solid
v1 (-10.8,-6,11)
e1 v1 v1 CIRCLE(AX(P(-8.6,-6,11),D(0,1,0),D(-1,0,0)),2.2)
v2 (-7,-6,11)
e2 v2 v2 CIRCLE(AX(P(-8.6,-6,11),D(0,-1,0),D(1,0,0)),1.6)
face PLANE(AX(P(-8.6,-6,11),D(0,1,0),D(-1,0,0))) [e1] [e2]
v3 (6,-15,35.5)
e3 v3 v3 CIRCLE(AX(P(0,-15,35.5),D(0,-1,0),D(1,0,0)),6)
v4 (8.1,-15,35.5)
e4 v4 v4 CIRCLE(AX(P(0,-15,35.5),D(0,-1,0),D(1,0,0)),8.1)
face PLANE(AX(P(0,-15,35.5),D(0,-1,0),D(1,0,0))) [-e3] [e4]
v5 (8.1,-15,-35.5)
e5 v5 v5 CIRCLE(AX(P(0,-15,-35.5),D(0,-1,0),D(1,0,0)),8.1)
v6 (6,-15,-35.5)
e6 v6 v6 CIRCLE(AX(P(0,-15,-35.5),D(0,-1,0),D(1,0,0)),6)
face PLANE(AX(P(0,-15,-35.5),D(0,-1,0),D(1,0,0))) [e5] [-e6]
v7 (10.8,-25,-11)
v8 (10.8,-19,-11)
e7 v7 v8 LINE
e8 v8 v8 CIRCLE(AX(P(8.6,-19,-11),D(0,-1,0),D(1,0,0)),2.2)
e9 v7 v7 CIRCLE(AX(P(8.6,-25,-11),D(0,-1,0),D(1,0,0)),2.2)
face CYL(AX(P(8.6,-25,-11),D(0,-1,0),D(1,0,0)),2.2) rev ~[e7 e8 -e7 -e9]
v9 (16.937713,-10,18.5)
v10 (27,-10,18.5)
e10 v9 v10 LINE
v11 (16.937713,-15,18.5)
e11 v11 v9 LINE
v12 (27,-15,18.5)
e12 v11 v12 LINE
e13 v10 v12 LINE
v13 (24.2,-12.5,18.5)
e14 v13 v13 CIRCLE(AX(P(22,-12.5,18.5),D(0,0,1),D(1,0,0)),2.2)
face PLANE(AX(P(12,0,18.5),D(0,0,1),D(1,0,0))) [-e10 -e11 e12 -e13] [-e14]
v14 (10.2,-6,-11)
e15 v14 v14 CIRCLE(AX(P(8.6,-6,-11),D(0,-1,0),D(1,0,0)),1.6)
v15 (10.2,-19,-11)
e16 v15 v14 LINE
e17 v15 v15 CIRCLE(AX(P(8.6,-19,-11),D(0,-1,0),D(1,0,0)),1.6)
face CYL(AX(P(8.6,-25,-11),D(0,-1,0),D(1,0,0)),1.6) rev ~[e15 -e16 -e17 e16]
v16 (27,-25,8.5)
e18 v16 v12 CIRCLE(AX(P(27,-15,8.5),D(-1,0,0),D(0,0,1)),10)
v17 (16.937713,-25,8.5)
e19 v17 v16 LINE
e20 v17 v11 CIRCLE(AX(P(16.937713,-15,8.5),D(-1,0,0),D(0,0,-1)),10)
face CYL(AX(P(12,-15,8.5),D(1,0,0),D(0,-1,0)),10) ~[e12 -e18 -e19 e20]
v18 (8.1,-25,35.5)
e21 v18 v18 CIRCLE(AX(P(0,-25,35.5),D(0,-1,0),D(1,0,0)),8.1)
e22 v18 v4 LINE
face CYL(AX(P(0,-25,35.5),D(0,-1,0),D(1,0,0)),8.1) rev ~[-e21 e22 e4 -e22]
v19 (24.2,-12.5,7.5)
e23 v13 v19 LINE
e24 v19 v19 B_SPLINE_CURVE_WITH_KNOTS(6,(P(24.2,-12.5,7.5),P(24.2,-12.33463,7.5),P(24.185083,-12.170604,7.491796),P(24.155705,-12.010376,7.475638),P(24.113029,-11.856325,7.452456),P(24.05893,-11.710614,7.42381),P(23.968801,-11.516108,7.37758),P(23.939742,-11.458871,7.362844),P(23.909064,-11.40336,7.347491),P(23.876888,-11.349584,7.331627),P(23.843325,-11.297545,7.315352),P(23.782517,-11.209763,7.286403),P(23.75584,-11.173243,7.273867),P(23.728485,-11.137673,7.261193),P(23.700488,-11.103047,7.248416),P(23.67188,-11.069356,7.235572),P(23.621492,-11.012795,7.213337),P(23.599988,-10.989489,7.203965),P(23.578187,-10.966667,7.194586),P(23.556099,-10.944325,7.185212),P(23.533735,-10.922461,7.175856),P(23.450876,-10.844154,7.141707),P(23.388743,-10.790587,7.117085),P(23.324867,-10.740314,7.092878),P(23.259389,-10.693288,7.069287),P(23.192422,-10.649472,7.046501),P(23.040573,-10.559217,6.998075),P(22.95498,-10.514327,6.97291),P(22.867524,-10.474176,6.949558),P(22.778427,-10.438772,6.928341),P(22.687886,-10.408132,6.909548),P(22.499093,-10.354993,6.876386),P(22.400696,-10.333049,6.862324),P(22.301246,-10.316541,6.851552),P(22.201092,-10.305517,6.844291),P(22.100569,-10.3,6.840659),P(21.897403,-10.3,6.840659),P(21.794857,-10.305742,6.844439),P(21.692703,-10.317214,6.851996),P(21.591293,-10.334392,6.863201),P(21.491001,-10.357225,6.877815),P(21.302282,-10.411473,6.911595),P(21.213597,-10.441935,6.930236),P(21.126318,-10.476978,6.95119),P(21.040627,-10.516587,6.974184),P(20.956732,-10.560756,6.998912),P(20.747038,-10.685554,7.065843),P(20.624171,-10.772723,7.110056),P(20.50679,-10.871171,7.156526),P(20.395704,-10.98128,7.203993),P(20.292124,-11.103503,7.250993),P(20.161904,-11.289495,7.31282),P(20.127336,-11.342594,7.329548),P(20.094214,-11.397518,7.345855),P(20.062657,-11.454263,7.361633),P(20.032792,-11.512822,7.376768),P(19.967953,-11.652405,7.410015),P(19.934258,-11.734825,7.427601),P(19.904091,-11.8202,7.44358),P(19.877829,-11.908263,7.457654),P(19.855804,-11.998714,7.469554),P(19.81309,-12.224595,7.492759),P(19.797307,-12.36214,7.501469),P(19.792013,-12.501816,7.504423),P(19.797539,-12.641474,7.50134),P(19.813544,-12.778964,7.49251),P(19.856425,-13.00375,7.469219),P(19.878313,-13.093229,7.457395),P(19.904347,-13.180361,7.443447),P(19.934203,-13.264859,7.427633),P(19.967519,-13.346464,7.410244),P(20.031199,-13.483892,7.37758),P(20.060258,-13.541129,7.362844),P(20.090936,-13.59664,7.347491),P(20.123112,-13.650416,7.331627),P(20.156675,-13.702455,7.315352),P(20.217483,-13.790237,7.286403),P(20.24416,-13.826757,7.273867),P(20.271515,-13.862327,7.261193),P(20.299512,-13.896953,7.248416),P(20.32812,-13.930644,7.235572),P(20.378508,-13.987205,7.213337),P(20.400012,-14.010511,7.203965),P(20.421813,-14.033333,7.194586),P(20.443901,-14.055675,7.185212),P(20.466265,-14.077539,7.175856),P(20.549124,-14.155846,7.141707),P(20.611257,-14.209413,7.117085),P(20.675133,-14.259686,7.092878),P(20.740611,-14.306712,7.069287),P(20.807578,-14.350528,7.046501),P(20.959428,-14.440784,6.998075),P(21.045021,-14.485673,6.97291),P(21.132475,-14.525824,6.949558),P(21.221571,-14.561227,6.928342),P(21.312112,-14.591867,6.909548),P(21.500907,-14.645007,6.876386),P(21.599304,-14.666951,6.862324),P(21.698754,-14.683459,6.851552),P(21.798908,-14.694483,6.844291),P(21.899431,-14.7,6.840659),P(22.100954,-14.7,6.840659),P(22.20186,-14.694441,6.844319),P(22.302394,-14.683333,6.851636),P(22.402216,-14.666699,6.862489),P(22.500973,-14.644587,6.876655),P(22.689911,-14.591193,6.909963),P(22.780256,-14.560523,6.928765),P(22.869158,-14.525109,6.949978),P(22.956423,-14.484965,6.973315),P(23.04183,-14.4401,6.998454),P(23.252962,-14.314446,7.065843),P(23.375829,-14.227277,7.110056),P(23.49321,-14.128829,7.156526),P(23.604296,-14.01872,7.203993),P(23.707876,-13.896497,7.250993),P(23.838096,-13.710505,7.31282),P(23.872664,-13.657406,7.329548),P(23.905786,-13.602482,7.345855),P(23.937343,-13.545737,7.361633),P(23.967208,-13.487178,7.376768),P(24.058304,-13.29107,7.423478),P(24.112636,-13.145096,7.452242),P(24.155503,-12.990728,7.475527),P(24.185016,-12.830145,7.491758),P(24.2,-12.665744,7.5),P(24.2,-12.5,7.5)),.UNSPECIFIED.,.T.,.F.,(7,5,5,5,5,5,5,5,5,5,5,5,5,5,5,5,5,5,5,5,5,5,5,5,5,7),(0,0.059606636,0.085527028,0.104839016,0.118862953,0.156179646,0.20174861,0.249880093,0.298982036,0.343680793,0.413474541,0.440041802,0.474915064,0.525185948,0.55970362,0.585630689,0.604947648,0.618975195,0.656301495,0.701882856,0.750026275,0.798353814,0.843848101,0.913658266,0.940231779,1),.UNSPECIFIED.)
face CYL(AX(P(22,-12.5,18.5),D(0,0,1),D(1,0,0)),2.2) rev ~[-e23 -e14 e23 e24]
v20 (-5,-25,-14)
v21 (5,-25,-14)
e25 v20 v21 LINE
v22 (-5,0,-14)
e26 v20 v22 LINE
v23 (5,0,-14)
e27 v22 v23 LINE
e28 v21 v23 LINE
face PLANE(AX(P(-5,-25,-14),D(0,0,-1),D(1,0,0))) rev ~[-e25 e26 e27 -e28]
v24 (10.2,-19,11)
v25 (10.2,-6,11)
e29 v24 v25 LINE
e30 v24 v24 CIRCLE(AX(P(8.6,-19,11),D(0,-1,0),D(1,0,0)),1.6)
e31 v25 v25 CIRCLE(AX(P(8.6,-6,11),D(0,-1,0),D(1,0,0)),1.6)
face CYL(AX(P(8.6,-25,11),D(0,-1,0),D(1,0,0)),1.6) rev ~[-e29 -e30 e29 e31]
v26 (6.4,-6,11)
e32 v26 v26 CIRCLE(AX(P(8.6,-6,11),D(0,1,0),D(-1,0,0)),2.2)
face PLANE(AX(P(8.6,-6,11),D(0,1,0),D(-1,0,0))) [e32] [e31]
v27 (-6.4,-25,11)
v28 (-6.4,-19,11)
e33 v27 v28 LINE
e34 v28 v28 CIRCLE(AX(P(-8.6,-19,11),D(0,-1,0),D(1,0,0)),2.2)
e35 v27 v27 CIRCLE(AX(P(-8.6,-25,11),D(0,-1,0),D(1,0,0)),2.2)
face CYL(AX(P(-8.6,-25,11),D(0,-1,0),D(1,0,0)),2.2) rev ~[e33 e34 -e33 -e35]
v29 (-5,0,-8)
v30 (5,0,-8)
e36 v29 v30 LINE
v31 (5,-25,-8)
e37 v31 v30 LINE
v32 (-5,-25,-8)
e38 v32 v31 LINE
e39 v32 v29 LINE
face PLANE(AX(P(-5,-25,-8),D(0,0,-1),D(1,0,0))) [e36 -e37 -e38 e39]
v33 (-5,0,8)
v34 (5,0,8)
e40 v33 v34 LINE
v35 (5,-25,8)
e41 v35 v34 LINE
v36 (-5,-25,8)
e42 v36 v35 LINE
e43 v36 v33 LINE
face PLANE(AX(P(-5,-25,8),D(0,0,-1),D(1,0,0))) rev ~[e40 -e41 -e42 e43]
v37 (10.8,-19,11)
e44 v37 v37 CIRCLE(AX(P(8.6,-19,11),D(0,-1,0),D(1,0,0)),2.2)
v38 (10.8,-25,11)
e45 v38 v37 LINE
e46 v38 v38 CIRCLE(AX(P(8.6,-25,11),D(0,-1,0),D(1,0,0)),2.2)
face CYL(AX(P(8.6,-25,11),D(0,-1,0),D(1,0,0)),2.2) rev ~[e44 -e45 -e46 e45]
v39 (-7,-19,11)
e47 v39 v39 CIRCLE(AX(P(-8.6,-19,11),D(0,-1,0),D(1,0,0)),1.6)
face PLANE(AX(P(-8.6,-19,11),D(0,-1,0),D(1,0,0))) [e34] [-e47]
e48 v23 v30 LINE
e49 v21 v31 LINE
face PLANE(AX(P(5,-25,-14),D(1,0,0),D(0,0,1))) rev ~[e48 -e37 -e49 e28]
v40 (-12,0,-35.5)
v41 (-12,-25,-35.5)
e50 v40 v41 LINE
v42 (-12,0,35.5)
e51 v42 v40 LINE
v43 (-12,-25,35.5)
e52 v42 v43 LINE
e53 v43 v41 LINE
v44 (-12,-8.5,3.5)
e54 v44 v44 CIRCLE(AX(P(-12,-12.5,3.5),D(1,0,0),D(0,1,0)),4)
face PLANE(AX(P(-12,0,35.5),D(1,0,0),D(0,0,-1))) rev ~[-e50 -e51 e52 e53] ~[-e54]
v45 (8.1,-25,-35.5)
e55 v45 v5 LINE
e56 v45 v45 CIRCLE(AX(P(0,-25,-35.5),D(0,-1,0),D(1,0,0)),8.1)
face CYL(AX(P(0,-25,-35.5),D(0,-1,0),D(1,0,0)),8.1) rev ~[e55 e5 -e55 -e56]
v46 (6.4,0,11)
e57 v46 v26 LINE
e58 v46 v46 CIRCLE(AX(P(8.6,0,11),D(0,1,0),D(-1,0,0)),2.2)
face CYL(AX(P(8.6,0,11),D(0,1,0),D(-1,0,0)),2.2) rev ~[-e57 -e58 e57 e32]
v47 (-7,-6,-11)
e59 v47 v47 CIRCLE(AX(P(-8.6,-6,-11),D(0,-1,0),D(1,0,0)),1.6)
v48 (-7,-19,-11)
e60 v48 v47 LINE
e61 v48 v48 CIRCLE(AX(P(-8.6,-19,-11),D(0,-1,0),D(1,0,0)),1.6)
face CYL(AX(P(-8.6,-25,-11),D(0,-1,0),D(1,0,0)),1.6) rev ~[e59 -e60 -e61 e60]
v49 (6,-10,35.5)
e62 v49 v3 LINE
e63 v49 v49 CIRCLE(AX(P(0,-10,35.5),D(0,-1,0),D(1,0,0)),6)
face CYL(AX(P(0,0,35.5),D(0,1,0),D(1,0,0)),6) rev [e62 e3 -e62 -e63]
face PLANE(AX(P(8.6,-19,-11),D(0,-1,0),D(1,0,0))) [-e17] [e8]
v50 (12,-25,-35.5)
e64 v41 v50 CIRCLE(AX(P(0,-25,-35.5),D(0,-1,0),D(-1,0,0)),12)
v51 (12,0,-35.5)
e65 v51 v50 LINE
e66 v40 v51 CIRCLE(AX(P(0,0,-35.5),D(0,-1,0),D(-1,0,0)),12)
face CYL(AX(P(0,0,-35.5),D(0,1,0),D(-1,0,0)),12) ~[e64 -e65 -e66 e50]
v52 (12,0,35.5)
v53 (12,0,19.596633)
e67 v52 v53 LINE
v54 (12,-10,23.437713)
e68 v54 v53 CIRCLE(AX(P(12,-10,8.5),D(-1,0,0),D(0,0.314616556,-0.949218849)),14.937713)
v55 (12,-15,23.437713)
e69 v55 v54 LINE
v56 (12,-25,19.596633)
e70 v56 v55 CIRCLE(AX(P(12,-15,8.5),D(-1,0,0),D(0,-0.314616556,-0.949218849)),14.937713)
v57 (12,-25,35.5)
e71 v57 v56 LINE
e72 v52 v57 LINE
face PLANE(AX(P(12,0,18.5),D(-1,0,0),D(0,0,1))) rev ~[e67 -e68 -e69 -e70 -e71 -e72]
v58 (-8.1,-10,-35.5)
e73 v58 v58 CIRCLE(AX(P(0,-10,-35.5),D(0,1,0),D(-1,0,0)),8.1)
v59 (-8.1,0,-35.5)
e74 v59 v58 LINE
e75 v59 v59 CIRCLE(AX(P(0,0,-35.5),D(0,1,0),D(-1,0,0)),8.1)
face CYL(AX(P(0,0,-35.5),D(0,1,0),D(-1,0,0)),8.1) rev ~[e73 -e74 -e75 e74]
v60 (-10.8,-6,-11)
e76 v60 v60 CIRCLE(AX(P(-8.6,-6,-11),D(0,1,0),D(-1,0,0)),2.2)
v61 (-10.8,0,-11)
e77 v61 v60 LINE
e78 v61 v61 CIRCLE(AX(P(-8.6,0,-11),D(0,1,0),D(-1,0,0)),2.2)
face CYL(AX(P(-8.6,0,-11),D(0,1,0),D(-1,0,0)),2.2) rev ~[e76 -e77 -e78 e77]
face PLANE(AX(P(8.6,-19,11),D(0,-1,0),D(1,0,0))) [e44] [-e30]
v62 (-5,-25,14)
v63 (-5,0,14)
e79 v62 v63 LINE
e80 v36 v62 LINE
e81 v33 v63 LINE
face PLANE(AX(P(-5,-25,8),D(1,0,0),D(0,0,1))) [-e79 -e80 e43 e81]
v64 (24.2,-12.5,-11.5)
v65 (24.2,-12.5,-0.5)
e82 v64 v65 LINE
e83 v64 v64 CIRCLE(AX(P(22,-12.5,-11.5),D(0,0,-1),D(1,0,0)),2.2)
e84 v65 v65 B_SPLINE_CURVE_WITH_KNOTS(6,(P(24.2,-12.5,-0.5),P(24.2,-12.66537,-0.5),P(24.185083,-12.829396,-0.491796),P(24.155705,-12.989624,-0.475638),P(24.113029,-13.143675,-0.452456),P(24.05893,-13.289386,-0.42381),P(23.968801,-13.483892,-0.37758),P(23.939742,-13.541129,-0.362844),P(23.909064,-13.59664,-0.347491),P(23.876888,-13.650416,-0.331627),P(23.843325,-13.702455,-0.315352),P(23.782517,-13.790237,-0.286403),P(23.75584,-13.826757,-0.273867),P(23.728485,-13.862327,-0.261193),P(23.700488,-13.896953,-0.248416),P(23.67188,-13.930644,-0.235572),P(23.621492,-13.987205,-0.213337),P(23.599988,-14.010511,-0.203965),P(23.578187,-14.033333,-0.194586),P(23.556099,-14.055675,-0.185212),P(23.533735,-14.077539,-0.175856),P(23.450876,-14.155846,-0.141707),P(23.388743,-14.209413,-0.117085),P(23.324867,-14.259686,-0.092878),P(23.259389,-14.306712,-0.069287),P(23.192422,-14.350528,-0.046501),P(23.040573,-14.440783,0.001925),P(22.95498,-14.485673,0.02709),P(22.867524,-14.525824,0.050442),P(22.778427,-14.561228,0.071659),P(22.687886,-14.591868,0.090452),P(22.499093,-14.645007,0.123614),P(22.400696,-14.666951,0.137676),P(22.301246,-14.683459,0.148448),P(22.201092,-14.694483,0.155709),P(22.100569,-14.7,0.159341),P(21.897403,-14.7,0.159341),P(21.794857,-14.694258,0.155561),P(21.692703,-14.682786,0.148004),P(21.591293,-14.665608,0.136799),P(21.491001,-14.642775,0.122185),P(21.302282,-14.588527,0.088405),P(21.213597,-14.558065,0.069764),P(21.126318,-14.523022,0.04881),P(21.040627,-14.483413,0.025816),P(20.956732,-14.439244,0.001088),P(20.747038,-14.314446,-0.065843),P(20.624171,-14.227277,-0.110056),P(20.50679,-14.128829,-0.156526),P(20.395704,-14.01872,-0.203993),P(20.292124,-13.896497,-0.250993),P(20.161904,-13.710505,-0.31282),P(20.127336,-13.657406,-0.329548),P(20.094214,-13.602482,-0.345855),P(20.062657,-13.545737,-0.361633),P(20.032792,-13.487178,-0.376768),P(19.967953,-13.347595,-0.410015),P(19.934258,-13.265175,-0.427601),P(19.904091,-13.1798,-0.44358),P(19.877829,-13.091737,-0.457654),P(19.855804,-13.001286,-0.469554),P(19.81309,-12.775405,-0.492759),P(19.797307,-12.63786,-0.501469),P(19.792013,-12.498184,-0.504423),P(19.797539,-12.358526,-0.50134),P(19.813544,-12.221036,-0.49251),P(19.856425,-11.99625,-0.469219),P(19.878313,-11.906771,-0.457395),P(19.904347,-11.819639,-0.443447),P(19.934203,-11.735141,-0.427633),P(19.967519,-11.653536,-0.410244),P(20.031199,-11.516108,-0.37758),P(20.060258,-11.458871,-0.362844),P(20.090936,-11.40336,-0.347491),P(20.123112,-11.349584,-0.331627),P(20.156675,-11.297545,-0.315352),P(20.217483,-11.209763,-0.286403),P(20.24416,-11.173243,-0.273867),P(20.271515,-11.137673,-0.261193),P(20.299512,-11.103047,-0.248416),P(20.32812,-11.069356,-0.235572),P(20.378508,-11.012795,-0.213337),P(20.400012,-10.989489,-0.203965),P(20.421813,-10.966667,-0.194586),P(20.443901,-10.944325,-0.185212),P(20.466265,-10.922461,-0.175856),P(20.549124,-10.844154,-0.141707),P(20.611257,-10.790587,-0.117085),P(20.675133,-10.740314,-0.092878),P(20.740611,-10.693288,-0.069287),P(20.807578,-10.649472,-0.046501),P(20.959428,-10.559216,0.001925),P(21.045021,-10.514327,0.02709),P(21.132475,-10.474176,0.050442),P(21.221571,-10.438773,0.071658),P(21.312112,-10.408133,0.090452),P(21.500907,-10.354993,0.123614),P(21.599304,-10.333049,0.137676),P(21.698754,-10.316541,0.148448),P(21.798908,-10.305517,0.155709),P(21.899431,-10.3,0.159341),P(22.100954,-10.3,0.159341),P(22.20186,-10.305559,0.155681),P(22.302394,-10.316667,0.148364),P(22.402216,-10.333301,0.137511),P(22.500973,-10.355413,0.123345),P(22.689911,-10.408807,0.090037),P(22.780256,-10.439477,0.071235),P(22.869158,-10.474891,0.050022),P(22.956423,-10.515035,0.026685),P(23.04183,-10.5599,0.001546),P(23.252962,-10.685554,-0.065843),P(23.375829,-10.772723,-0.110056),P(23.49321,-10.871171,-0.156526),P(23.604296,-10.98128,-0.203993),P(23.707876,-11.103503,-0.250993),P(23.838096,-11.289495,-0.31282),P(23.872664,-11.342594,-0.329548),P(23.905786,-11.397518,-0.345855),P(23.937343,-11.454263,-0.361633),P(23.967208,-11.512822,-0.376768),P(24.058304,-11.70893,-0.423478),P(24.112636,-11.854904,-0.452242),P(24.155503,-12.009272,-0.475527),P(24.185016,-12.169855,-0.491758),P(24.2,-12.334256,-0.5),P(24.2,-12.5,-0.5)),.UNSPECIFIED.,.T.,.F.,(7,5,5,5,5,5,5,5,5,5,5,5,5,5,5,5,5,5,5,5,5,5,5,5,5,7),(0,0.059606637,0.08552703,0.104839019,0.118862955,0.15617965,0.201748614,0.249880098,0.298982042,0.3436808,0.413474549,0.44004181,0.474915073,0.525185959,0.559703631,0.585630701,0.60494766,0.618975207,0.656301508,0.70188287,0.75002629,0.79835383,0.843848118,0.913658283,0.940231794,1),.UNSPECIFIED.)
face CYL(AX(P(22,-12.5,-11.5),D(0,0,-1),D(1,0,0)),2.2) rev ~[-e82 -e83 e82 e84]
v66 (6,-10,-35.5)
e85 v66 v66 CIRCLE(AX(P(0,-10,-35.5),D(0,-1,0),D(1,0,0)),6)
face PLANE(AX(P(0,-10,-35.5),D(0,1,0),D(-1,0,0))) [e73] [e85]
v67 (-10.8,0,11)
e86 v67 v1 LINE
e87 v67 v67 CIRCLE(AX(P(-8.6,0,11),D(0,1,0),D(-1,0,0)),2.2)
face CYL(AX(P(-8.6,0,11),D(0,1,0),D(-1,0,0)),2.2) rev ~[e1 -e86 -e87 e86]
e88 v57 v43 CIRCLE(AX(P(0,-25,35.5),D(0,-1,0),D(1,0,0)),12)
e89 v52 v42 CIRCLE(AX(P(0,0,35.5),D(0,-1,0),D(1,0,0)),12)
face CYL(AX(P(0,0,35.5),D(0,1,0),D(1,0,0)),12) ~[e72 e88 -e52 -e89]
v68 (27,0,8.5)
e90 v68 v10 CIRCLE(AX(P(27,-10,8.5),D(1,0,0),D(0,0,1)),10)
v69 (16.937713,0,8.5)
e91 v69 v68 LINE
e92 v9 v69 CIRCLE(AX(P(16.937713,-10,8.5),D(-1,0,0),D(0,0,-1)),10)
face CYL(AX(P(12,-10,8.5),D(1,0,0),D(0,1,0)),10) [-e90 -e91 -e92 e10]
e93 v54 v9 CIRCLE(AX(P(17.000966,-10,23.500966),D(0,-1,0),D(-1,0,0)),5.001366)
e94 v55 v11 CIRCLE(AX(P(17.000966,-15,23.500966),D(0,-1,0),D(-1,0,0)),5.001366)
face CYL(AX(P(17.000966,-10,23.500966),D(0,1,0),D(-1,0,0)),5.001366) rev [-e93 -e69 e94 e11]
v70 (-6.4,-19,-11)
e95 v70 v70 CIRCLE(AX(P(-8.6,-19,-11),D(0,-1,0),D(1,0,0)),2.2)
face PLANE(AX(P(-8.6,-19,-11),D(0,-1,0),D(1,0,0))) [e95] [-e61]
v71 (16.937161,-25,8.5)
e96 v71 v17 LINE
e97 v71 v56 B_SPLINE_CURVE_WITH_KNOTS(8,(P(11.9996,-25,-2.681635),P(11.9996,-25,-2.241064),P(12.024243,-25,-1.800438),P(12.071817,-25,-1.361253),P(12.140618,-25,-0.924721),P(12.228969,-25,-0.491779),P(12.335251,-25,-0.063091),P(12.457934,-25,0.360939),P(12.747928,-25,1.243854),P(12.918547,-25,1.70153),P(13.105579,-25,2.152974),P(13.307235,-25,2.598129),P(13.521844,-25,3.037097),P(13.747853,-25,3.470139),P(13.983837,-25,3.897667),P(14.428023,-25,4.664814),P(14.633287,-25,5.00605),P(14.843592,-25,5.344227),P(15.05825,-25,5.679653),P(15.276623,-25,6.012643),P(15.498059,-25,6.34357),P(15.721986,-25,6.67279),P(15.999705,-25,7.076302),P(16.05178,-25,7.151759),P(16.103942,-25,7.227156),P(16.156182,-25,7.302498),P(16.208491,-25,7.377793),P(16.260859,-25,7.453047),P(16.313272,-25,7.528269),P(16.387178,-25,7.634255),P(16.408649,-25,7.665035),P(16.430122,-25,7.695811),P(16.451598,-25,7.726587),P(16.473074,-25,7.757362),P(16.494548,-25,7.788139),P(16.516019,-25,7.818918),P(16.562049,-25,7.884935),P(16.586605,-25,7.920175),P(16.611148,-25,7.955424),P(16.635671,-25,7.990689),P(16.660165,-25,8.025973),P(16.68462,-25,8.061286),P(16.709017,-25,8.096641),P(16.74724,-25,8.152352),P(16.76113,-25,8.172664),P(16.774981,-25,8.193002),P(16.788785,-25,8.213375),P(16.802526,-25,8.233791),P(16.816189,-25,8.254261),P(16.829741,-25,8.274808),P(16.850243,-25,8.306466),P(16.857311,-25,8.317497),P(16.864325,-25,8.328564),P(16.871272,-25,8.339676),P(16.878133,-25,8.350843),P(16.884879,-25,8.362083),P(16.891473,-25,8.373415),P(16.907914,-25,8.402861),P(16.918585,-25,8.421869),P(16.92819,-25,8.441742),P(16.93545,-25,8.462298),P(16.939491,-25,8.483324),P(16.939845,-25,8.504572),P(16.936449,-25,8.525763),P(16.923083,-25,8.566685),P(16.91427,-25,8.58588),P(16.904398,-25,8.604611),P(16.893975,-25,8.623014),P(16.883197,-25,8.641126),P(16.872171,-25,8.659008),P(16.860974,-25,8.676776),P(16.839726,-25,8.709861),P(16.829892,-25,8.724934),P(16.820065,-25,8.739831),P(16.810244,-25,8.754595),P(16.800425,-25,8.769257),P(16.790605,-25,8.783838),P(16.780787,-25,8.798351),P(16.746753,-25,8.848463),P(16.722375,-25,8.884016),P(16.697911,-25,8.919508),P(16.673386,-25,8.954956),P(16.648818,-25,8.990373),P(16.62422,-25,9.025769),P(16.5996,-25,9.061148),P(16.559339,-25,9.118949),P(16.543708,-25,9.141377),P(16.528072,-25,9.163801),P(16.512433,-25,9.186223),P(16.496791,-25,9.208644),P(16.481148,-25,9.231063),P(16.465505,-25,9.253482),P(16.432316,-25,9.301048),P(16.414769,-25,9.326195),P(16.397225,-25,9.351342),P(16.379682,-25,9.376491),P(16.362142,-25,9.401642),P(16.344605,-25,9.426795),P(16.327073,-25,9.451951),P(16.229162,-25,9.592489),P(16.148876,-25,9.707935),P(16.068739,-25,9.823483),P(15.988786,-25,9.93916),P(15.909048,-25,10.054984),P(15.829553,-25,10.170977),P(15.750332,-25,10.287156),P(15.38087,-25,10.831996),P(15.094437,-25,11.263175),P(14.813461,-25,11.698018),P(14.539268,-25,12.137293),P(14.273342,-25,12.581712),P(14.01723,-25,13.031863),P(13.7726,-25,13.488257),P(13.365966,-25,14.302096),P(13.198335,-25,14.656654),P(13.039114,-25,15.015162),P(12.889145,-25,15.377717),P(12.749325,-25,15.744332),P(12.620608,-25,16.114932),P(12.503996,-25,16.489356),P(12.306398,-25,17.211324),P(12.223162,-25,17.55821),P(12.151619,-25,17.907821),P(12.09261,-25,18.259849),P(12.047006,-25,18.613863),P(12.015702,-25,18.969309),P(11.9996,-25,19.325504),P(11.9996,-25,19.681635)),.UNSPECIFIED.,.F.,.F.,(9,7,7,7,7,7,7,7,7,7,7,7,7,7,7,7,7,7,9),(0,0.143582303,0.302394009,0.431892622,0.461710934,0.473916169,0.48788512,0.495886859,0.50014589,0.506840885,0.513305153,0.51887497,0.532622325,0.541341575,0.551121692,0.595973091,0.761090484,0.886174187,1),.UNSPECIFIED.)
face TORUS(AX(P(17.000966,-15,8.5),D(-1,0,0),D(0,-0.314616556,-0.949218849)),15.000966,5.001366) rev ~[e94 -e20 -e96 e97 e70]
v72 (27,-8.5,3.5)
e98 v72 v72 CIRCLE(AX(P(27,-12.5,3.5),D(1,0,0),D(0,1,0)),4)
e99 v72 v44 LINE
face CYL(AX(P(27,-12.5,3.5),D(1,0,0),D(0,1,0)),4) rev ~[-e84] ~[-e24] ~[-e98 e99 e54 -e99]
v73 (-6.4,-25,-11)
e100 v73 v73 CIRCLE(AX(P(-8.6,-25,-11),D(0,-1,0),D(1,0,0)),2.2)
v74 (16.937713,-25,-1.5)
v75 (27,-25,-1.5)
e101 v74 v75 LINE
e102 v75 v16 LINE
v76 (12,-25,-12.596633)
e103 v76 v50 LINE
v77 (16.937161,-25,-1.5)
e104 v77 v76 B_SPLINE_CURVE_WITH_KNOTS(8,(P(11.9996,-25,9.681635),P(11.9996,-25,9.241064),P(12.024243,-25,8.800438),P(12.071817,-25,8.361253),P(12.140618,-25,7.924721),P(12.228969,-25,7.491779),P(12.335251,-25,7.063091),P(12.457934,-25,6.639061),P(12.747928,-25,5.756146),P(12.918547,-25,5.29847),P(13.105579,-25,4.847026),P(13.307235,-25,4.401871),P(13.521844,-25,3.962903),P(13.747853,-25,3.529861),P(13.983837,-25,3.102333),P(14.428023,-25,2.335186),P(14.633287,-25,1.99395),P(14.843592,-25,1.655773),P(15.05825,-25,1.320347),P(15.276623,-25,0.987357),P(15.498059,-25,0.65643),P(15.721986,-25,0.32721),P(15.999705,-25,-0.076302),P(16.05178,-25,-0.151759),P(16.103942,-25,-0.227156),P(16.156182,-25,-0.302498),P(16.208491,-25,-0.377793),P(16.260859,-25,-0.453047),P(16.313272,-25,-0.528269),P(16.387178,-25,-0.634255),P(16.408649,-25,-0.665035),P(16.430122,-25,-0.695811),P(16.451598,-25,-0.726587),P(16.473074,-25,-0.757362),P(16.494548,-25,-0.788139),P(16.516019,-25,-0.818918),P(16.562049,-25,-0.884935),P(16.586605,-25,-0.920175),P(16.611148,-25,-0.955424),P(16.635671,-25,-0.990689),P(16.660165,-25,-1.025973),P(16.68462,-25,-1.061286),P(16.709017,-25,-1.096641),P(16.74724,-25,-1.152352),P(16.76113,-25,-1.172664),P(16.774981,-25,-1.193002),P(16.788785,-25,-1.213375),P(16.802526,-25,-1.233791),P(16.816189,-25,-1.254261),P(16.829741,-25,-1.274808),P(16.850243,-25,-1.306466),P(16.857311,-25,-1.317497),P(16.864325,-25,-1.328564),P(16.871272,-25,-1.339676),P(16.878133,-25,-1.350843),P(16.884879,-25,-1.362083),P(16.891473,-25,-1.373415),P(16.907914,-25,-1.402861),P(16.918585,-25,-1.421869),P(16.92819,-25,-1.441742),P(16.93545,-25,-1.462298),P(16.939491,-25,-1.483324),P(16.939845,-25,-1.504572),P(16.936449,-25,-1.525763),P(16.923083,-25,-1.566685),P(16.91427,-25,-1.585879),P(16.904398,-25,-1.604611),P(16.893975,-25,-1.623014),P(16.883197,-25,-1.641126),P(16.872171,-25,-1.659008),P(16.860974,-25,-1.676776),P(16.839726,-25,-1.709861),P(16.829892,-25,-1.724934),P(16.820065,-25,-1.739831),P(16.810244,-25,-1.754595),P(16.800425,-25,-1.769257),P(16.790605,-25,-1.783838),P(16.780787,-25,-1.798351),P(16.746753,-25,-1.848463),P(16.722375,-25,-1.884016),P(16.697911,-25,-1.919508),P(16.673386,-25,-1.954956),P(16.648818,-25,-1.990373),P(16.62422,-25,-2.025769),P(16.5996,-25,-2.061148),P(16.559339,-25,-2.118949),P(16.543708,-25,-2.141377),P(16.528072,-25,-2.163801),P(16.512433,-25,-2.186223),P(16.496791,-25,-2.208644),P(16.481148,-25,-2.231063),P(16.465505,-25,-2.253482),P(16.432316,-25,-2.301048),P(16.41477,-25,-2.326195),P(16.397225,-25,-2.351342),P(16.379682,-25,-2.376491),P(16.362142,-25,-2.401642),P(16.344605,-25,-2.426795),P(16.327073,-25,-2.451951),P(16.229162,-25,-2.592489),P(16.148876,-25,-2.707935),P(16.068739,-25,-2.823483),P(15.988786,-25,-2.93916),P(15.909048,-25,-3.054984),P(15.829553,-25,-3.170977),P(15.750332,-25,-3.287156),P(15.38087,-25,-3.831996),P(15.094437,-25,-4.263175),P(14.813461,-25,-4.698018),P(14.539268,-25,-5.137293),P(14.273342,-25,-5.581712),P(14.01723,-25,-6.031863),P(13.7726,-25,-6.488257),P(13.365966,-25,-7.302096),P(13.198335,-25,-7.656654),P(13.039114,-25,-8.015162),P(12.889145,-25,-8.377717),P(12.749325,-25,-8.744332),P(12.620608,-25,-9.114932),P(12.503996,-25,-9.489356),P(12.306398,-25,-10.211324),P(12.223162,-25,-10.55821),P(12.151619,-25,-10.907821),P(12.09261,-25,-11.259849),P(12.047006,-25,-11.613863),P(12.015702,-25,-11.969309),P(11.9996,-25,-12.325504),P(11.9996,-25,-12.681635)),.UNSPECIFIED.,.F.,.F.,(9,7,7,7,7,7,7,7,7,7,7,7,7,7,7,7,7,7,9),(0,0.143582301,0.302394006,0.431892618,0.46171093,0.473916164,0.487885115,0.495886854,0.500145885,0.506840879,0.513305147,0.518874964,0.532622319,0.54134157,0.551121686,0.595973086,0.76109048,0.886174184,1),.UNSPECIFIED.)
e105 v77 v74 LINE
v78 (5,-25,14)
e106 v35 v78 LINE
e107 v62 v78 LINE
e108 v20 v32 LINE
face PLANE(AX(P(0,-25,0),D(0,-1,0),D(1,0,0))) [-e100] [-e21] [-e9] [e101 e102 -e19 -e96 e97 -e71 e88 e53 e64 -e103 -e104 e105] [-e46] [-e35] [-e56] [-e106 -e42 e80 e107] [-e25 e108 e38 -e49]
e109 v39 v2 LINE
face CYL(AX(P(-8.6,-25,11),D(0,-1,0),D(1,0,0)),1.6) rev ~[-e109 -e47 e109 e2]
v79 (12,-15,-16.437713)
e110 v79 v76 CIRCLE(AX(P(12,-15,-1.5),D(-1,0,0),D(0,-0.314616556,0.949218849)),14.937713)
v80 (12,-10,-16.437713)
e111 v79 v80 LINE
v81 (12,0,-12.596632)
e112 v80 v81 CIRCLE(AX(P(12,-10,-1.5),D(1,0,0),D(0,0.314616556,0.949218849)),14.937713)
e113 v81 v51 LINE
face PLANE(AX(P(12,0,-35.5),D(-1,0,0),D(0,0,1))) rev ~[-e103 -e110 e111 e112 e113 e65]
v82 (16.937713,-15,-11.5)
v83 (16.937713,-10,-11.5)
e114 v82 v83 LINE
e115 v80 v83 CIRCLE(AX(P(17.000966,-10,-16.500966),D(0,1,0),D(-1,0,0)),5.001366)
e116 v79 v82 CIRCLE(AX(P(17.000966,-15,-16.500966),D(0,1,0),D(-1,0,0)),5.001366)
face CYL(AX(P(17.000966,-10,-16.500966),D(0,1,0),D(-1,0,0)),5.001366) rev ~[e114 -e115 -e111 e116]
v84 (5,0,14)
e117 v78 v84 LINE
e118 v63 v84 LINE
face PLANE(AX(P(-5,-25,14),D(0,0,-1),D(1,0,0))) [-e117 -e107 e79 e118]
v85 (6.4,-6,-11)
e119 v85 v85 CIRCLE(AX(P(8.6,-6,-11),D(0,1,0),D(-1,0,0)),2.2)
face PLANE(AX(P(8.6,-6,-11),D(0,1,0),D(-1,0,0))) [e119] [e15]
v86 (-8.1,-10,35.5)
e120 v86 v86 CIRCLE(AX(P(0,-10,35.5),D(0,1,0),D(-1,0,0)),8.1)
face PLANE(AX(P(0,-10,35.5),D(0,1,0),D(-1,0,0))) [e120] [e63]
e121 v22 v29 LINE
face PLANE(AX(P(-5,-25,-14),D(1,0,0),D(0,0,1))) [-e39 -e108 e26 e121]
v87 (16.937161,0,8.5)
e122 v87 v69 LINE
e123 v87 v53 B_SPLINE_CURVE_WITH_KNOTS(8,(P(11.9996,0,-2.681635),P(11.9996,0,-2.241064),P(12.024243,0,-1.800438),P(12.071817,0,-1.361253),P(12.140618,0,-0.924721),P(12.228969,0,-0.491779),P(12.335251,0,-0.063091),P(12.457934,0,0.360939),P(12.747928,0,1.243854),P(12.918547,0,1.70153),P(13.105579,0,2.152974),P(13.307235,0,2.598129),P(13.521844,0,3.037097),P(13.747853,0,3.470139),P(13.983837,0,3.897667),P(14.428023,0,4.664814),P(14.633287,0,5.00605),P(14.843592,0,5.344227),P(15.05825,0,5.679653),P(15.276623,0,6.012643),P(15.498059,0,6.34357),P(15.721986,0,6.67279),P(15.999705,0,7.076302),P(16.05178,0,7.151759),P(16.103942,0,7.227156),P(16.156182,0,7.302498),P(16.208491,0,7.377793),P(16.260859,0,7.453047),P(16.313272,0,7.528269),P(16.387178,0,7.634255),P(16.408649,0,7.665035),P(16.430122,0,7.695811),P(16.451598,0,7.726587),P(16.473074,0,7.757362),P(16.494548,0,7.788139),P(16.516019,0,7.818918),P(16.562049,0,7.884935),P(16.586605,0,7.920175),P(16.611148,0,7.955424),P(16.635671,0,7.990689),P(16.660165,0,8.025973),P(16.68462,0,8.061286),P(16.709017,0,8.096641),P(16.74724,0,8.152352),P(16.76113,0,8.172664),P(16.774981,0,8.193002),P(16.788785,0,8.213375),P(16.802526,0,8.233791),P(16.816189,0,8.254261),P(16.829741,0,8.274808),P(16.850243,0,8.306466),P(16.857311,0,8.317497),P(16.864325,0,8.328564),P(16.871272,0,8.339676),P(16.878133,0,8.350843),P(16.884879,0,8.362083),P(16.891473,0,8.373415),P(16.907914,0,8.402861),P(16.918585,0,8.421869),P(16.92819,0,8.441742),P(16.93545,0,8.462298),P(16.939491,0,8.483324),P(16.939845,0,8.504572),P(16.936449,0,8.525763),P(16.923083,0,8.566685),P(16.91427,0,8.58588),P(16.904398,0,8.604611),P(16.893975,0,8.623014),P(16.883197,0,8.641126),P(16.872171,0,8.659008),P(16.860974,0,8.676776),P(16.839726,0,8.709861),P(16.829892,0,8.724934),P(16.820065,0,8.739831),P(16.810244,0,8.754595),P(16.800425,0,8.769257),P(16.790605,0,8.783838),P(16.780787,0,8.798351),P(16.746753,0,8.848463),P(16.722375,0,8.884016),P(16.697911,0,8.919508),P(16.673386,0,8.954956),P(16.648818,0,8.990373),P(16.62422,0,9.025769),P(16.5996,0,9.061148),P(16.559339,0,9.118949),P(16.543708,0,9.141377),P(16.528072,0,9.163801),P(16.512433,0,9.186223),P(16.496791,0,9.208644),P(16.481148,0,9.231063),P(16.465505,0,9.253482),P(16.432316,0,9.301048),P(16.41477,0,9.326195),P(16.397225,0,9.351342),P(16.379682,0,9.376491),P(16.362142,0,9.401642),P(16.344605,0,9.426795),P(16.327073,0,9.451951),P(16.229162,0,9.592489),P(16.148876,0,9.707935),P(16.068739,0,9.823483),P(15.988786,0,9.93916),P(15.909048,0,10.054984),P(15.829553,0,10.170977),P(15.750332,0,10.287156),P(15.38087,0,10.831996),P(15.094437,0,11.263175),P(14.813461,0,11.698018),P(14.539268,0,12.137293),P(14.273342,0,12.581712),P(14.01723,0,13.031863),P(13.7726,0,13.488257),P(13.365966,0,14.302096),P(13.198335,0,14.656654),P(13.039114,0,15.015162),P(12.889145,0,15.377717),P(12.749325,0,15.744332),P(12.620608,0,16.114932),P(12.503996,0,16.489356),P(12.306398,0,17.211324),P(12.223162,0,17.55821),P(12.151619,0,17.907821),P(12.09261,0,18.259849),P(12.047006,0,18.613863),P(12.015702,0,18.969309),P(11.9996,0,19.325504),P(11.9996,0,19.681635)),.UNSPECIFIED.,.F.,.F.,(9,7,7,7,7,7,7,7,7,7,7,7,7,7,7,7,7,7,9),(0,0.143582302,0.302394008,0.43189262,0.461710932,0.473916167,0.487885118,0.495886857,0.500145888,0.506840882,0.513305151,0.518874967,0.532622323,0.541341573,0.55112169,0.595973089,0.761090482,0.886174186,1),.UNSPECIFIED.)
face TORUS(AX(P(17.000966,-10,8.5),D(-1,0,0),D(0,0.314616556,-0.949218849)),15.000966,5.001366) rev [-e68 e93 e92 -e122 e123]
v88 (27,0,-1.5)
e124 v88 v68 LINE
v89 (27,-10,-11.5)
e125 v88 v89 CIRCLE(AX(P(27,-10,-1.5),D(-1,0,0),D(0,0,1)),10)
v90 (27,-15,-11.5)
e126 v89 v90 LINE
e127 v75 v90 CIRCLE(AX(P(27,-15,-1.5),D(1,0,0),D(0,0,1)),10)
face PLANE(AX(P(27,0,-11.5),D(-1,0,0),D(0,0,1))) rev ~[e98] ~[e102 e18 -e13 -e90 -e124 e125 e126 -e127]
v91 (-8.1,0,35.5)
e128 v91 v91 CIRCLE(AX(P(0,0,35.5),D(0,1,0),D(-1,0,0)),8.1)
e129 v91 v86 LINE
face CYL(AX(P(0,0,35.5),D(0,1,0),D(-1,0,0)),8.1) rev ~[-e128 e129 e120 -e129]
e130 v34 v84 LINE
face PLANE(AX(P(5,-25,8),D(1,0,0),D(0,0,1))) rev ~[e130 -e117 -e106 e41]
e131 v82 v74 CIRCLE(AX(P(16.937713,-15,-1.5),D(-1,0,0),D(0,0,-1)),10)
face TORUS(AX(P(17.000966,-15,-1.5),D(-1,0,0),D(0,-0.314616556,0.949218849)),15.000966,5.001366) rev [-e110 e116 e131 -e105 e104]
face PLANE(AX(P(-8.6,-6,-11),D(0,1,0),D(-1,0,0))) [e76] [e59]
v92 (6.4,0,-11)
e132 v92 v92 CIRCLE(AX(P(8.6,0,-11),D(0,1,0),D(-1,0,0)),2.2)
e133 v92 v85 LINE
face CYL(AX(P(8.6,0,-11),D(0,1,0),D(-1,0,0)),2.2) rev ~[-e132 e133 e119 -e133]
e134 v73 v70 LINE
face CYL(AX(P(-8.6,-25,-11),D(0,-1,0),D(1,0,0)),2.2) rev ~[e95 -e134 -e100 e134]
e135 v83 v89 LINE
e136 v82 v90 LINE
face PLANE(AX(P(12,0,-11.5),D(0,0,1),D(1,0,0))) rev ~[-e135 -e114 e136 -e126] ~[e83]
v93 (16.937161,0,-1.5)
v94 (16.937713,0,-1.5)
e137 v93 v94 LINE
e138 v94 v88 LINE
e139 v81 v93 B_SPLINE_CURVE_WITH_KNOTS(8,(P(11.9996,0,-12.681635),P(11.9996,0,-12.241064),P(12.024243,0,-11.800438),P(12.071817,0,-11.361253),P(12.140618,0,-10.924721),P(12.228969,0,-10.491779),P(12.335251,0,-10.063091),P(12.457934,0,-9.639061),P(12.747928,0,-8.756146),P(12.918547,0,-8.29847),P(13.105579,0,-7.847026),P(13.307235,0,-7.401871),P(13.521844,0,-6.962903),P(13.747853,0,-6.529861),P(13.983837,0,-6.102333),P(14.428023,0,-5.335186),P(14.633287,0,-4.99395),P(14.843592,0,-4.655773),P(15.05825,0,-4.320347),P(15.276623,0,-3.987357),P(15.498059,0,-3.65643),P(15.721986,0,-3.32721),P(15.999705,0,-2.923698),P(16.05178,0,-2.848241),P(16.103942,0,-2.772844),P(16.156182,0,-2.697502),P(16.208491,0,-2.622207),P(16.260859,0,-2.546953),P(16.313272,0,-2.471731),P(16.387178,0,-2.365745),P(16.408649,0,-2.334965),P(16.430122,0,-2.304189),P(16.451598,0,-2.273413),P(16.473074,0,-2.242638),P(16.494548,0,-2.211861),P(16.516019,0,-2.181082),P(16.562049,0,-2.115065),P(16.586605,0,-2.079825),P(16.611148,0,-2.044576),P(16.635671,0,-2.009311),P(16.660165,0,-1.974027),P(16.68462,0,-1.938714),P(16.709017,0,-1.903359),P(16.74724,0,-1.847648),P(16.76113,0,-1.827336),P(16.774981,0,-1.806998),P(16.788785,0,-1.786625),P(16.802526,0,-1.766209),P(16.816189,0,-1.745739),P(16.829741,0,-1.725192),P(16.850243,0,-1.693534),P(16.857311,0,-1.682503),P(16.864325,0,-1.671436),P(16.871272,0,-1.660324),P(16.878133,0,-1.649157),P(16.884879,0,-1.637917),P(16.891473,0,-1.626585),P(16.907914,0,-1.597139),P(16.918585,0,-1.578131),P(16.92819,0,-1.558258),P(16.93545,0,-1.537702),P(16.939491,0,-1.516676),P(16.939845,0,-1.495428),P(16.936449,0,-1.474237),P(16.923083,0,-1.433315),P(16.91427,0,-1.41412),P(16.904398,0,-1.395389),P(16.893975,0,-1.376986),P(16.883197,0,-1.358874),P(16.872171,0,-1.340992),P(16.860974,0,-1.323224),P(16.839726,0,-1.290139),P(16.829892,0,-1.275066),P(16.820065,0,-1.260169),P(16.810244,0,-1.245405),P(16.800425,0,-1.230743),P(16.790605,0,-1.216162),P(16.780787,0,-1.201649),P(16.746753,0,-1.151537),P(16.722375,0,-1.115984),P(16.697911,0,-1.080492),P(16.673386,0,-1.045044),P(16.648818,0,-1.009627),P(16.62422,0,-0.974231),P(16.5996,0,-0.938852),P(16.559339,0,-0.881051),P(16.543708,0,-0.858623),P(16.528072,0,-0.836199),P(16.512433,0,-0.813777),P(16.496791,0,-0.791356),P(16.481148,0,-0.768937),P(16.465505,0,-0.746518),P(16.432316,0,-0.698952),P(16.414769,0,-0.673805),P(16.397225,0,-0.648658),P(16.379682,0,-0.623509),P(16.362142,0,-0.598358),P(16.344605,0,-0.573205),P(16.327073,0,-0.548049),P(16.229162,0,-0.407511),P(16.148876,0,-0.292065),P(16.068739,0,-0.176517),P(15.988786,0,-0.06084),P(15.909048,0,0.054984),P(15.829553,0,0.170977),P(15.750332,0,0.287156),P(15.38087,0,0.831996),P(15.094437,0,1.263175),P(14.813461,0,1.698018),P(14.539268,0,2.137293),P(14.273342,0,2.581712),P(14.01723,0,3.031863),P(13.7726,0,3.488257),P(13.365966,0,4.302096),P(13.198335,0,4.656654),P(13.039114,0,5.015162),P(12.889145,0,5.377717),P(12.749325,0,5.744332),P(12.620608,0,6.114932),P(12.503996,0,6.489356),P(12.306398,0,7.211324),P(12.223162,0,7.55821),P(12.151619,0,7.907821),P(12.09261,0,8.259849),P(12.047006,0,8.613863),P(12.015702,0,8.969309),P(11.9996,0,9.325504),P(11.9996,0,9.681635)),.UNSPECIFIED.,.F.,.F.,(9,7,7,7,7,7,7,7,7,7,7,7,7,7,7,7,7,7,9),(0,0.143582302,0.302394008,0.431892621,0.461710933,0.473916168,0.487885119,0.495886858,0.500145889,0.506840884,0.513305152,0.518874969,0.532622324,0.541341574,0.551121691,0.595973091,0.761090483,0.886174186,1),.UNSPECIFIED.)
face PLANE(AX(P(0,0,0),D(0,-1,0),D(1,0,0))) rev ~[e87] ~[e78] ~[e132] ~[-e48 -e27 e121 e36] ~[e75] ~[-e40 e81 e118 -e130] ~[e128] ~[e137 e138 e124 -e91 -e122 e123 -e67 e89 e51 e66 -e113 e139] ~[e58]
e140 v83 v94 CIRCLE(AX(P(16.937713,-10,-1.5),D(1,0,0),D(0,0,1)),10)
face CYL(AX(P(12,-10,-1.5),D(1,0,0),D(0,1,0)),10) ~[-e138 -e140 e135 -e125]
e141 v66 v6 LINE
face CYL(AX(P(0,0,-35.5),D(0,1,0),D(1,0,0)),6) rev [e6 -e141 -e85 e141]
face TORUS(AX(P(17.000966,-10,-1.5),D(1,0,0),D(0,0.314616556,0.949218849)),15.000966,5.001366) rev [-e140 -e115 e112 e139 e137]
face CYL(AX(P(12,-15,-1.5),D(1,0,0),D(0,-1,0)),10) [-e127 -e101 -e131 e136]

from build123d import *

# Parameters (mm, degrees)
F0_R         = 6
F0_W         = 15
F0_H         = 30
F1_DEPTH     = 25
F2_R         = 8.1
F2_R_2       = 6
F3_DEPTH     = 10
F4_R         = 8.1
F4_R_2       = 6
F5_DEPTH     = 10
F6_R         = 4
F7_DEPTH     = 39.001
F8_R         = 10
F9_T1_DEPTH  = 5
F9_T6_ANGLE  = 161.6623328293
F9_T11_ANGLE = 161.6623328293
F9_T16_ANGLE = 161.6623328293
F9_T21_ANGLE = 161.6623328293
F10_R        = 2.2
F11_DEPTH    = 11.6603414823
F12_R        = 2.2
F13_DEPTH    = 11.6603414823
F14_R        = 1.6
F14_W        = 10
F14_H        = 6
F15_DEPTH    = 25.0010004328
F16_R        = 2.2
F16_R_2      = 1.6
F17_DEPTH    = 6
F18_R        = 2.2
F19_DEPTH    = 6


# Not quite as in the source:
# - a fillet or chamfer that OpenCascade refuses, or shapes differently, is made with other operations: its cross-section is extruded or revolved along the edge and cut away or added


with BuildPart() as f1:
    # F0 (on Front) → F1 (new body)
    with BuildSketch(Plane.XZ):
        with BuildLine():
            Line((12, 18.5), (12, 35.5))
            ThreePointArc((12, 35.5), (0, 23.5), (-12, 35.5))
            Line((-12, 35.5), (-12, -35.5))
            ThreePointArc((-12, -35.5), (0, -23.5), (12, -35.5))
            Line((12, -35.5), (12, -11.5))
            Line((12, -11.5), (12, 18.5))
        make_face()
        with BuildLine():
            ThreePointArc((-12, 35.5), (0, 23.5), (12, 35.5))
            ThreePointArc((12, 35.5), (0, 47.5), (-12, 35.5))
        make_face()
        with Locations((0, 35.5)):
            Circle(F0_R, mode=Mode.SUBTRACT)
        with BuildLine():
            ThreePointArc((12, -35.5), (0, -23.5), (-12, -35.5))
            ThreePointArc((-12, -35.5), (0, -47.5), (12, -35.5))
        make_face()
        with Locations((0, -35.5)):
            Circle(F0_R, mode=Mode.SUBTRACT)
        with Locations((19.5, 3.5)):
            Rectangle(F0_W, F0_H)
    extrude(amount=F1_DEPTH)

    # F2 (on face) → F3 (cut)
    with BuildSketch(Plane.XZ.offset(25)):
        with Locations((0, 35.5)):
            Circle(F2_R)
        with Locations((0, 35.5)):
            Circle(F2_R_2, mode=Mode.SUBTRACT)
        with Locations((0, -35.5)):
            Circle(F2_R)
        with Locations((0, -35.5)):
            Circle(F2_R_2, mode=Mode.SUBTRACT)
    extrude(amount=-F3_DEPTH, mode=Mode.SUBTRACT)

    # F4 (on face) → F5 (cut)
    with BuildSketch(Plane(origin=(0, 0, 0), x_dir=(-1, 0, 0), z_dir=(0, 1, 0))):
        with Locations((0, 35.5)):
            Circle(F4_R)
        with Locations((0, 35.5)):
            Circle(F4_R_2, mode=Mode.SUBTRACT)
        with Locations((0, -35.5)):
            Circle(F4_R)
        with Locations((0, -35.5)):
            Circle(F4_R_2, mode=Mode.SUBTRACT)
    extrude(amount=-F5_DEPTH, mode=Mode.SUBTRACT)

    # F6 (on face) → F7 (cut, through all)
    with BuildSketch(Plane.YZ.offset(27)):
        with Locations((-12.5, 3.5)):
            Circle(F6_R)
    extrude(amount=-F7_DEPTH, mode=Mode.SUBTRACT)

    # F8
    f8_edges = [f1.edges().sort_by_distance(p)[0] for p in [
        (19.5, -25, 18.5),
        (19.5, 0, 18.5),
        (19.5, -25, -11.5),
        (19.5, 0, -11.5),
    ]]
    fillet(f8_edges, radius=F8_R)

    # F9: fillet of radius 5 on 6 edges, made by hand

    # F9_s2 → F9_t1 (join)
    with BuildSketch(Plane.XZ.offset(10)):
        with BuildLine():
            ThreePointArc((11.9996, 23.5009656854), (13.4644660941, 19.9644660941), (17.0009656854, 18.4996))
            Line((17.0009656854, 18.4996), (17.0009656854, 17.9994634315))
            ThreePointArc((17.0009656854, 17.9994634315), (14.5004828427, 17.9998634315), (12, 17.9998634315))
            Line((12, 17.9998634315), (11.4998634315, 18.5))
            ThreePointArc((11.4998634315, 18.5), (11.4998634315, 21.0004828427), (11.4994634315, 23.5009656854))
            Line((11.4994634315, 23.5009656854), (11.9996, 23.5009656854))
        make_face()
        with BuildLine():
            ThreePointArc((11.9996, -16.5009656854), (13.4644660941, -12.9644660941), (17.0009656854, -11.4996))
            Line((17.0009656854, -11.4996), (17.0009656854, -10.9994634315))
            ThreePointArc((17.0009656854, -10.9994634315), (14.5004828427, -10.9998634315), (12, -10.9998634315))
            Line((12, -10.9998634315), (11.4998634315, -11.5))
            ThreePointArc((11.4998634315, -11.5), (11.4998634315, -14.0004828427), (11.4994634315, -16.5009656854))
            Line((11.4994634315, -16.5009656854), (11.9996, -16.5009656854))
        make_face()
    extrude(amount=F9_T1_DEPTH)


with BuildPart() as f9_tool4:
    # F9_s5 → F9_t6 (revolve)
    with BuildSketch(Plane(origin=(0, -6.4717245278, -2.1450392426), x_dir=(1, 0, 0), z_dir=(0, -0.9492188488, -0.3146165557))):
        with BuildLine():
            ThreePointArc((11.9996, -3.7864399137), (13.4644660941, -0.2499403224), (17.0009656854, 1.2149257717))
            Line((17.0009656854, 1.2149257717), (17.0009656854, 1.7150623402))
            ThreePointArc((17.0009656854, 1.7150623402), (14.5004828427, 1.7146623402), (12, 1.7146623402))
            Line((12, 1.7146623402), (11.4998634315, 1.2145257717))
            ThreePointArc((11.4998634315, 1.2145257717), (11.4998634315, -1.285957071), (11.4994634315, -3.7864399137))
            Line((11.4994634315, -3.7864399137), (11.9996, -3.7864399137))
        make_face()
    revolve(axis=Axis((12, -10, 8.5), (1, 0, 0)), revolution_arc=F9_T6_ANGLE)

    split(bisect_by=Plane.XZ, keep=Keep.TOP)


with BuildPart() as f1_1:
    add(f1.part)

    # F9_t3: union F9_tool4
    add(f9_tool4.part)


with BuildPart() as f9_tool9:
    # F9_s10 → F9_t11 (revolve)
    with BuildSketch(Plane(origin=(0, -16.053686044, 5.3209598778), x_dir=(1, 0, 0), z_dir=(0, 0.9492188488, -0.3146165557))):
        with BuildLine():
            ThreePointArc((11.9996, 11.6518538065), (13.4644660941, 8.1153542151), (17.0009656854, 6.650488121))
            Line((17.0009656854, 6.650488121), (17.0009656854, 6.1503515525))
            ThreePointArc((17.0009656854, 6.1503515525), (14.5004828427, 6.1507515525), (12, 6.1507515525))
            Line((12, 6.1507515525), (11.4998634315, 6.650888121))
            ThreePointArc((11.4998634315, 6.650888121), (11.4998634315, 9.1513709638), (11.4994634315, 11.6518538065))
            Line((11.4994634315, 11.6518538065), (11.9996, 11.6518538065))
        make_face()
    revolve(axis=Axis((12, -15, 8.5), (-1, 0, 0)), revolution_arc=F9_T11_ANGLE)

    split(bisect_by=Plane.XZ.offset(25), keep=Keep.BOTTOM)


with BuildPart() as f1_2:
    add(f1_1.part)

    # F9_t8: union F9_tool9
    add(f9_tool9.part)


with BuildPart() as f9_tool14:
    # F9_s15 → F9_t16 (revolve)
    with BuildSketch(Plane(origin=(0, -8.5622042815, 2.8379242825), x_dir=(1, 0, 0), z_dir=(0, -0.9492188488, 0.3146165557))):
        with BuildLine():
            ThreePointArc((17.0009656854, 5.4296061697), (13.4644660941, 6.8944722638), (11.9996, 10.4309718552))
            Line((11.9996, 10.4309718552), (11.4994634315, 10.4309718552))
            ThreePointArc((11.4994634315, 10.4309718552), (11.4998634315, 7.9304890124), (11.4998634315, 5.4300061697))
            Line((11.4998634315, 5.4300061697), (12, 4.9298696012))
            ThreePointArc((12, 4.9298696012), (14.5004828427, 4.9298696012), (17.0009656854, 4.9294696012))
            Line((17.0009656854, 4.9294696012), (17.0009656854, 5.4296061697))
        make_face()
    revolve(axis=Axis((12, -10, -1.5), (-1, 0, 0)), revolution_arc=F9_T16_ANGLE)

    split(bisect_by=Plane.XZ, keep=Keep.TOP)


with BuildPart() as f1_3:
    add(f1_2.part)

    # F9_t13: union F9_tool14
    add(f9_tool14.part)


with BuildPart() as f9_tool19:
    # F9_s20 → F9_t21 (revolve)
    with BuildSketch(Plane(origin=(0, -13.9632062903, -4.6280748379), x_dir=(1, 0, 0), z_dir=(0, 0.9492188488, 0.3146165557))):
        with BuildLine():
            ThreePointArc((11.9996, -18.2963857479), (13.4644660941, -14.7598861565), (17.0009656854, -13.2950200625))
            Line((17.0009656854, -13.2950200625), (17.0009656854, -12.7948834939))
            ThreePointArc((17.0009656854, -12.7948834939), (14.5004828427, -12.7952834939), (12, -12.7952834939))
            Line((12, -12.7952834939), (11.4998634315, -13.2954200625))
            ThreePointArc((11.4998634315, -13.2954200625), (11.4998634315, -15.7959029052), (11.4994634315, -18.2963857479))
            Line((11.4994634315, -18.2963857479), (11.9996, -18.2963857479))
        make_face()
    revolve(axis=Axis((12, -15, -1.5), (1, 0, 0)), revolution_arc=F9_T21_ANGLE)

    split(bisect_by=Plane.XZ.offset(25), keep=Keep.BOTTOM)


with BuildPart() as f1_4:
    add(f1_3.part)

    # F9_t18: union F9_tool19
    add(f9_tool19.part)

    # F10 (on face) → F11 (cut, through all)
    with BuildSketch(Plane.XY.offset(18.5)):
        with Locations((22, -12.5)):
            Circle(F10_R)
    extrude(amount=-F11_DEPTH, mode=Mode.SUBTRACT)

    # F12 (on face) → F13 (cut, through all)
    with BuildSketch(Plane(origin=(0, 0, -11.5), x_dir=(1, 0, 0), z_dir=(0, 0, -1))):
        with Locations((22, 12.5)):
            Circle(F12_R)
    extrude(amount=-F13_DEPTH, mode=Mode.SUBTRACT)

    # F14 (on face) → F15 (cut, through all)
    with BuildSketch(Plane.XZ.offset(25)):
        with Locations((-8.6, 11)):
            Circle(F14_R)
        with Locations((0, 11)):
            Rectangle(F14_W, F14_H)
        with Locations((8.6, 11)):
            Circle(F14_R)
        with Locations((8.6, -11)):
            Circle(F14_R)
        with Locations((0, -11)):
            Rectangle(F14_W, F14_H)
        with Locations((-8.6, -11)):
            Circle(F14_R)
    extrude(amount=-F15_DEPTH, mode=Mode.SUBTRACT)

    # F16 (on face) → F17 (cut)
    with BuildSketch(Plane.XZ.offset(25)):
        with Locations((-8.6, 11)):
            Circle(F16_R)
        with Locations((-8.6, 11)):
            Circle(F16_R_2, mode=Mode.SUBTRACT)
        with Locations((8.6, 11)):
            Circle(F16_R)
        with Locations((8.6, 11)):
            Circle(F16_R_2, mode=Mode.SUBTRACT)
        with Locations((8.6, -11)):
            Circle(F16_R)
        with Locations((8.6, -11)):
            Circle(F16_R_2, mode=Mode.SUBTRACT)
        with Locations((-8.6, -11)):
            Circle(F16_R)
        with Locations((-8.6, -11)):
            Circle(F16_R_2, mode=Mode.SUBTRACT)
    extrude(amount=-F17_DEPTH, mode=Mode.SUBTRACT)

    # F18 (on face) → F19 (cut)
    with BuildSketch(Plane(origin=(0, 0, 0), x_dir=(-1, 0, 0), z_dir=(0, 1, 0))):
        with Locations((8.6, 11)):
            Circle(F18_R)
        with Locations((-8.6, 11)):
            Circle(F18_R)
        with Locations((-8.6, -11)):
            Circle(F18_R)
        with Locations((8.6, -11)):
            Circle(F18_R)
    extrude(amount=-F19_DEPTH, mode=Mode.SUBTRACT)


solid = f1_4.part
